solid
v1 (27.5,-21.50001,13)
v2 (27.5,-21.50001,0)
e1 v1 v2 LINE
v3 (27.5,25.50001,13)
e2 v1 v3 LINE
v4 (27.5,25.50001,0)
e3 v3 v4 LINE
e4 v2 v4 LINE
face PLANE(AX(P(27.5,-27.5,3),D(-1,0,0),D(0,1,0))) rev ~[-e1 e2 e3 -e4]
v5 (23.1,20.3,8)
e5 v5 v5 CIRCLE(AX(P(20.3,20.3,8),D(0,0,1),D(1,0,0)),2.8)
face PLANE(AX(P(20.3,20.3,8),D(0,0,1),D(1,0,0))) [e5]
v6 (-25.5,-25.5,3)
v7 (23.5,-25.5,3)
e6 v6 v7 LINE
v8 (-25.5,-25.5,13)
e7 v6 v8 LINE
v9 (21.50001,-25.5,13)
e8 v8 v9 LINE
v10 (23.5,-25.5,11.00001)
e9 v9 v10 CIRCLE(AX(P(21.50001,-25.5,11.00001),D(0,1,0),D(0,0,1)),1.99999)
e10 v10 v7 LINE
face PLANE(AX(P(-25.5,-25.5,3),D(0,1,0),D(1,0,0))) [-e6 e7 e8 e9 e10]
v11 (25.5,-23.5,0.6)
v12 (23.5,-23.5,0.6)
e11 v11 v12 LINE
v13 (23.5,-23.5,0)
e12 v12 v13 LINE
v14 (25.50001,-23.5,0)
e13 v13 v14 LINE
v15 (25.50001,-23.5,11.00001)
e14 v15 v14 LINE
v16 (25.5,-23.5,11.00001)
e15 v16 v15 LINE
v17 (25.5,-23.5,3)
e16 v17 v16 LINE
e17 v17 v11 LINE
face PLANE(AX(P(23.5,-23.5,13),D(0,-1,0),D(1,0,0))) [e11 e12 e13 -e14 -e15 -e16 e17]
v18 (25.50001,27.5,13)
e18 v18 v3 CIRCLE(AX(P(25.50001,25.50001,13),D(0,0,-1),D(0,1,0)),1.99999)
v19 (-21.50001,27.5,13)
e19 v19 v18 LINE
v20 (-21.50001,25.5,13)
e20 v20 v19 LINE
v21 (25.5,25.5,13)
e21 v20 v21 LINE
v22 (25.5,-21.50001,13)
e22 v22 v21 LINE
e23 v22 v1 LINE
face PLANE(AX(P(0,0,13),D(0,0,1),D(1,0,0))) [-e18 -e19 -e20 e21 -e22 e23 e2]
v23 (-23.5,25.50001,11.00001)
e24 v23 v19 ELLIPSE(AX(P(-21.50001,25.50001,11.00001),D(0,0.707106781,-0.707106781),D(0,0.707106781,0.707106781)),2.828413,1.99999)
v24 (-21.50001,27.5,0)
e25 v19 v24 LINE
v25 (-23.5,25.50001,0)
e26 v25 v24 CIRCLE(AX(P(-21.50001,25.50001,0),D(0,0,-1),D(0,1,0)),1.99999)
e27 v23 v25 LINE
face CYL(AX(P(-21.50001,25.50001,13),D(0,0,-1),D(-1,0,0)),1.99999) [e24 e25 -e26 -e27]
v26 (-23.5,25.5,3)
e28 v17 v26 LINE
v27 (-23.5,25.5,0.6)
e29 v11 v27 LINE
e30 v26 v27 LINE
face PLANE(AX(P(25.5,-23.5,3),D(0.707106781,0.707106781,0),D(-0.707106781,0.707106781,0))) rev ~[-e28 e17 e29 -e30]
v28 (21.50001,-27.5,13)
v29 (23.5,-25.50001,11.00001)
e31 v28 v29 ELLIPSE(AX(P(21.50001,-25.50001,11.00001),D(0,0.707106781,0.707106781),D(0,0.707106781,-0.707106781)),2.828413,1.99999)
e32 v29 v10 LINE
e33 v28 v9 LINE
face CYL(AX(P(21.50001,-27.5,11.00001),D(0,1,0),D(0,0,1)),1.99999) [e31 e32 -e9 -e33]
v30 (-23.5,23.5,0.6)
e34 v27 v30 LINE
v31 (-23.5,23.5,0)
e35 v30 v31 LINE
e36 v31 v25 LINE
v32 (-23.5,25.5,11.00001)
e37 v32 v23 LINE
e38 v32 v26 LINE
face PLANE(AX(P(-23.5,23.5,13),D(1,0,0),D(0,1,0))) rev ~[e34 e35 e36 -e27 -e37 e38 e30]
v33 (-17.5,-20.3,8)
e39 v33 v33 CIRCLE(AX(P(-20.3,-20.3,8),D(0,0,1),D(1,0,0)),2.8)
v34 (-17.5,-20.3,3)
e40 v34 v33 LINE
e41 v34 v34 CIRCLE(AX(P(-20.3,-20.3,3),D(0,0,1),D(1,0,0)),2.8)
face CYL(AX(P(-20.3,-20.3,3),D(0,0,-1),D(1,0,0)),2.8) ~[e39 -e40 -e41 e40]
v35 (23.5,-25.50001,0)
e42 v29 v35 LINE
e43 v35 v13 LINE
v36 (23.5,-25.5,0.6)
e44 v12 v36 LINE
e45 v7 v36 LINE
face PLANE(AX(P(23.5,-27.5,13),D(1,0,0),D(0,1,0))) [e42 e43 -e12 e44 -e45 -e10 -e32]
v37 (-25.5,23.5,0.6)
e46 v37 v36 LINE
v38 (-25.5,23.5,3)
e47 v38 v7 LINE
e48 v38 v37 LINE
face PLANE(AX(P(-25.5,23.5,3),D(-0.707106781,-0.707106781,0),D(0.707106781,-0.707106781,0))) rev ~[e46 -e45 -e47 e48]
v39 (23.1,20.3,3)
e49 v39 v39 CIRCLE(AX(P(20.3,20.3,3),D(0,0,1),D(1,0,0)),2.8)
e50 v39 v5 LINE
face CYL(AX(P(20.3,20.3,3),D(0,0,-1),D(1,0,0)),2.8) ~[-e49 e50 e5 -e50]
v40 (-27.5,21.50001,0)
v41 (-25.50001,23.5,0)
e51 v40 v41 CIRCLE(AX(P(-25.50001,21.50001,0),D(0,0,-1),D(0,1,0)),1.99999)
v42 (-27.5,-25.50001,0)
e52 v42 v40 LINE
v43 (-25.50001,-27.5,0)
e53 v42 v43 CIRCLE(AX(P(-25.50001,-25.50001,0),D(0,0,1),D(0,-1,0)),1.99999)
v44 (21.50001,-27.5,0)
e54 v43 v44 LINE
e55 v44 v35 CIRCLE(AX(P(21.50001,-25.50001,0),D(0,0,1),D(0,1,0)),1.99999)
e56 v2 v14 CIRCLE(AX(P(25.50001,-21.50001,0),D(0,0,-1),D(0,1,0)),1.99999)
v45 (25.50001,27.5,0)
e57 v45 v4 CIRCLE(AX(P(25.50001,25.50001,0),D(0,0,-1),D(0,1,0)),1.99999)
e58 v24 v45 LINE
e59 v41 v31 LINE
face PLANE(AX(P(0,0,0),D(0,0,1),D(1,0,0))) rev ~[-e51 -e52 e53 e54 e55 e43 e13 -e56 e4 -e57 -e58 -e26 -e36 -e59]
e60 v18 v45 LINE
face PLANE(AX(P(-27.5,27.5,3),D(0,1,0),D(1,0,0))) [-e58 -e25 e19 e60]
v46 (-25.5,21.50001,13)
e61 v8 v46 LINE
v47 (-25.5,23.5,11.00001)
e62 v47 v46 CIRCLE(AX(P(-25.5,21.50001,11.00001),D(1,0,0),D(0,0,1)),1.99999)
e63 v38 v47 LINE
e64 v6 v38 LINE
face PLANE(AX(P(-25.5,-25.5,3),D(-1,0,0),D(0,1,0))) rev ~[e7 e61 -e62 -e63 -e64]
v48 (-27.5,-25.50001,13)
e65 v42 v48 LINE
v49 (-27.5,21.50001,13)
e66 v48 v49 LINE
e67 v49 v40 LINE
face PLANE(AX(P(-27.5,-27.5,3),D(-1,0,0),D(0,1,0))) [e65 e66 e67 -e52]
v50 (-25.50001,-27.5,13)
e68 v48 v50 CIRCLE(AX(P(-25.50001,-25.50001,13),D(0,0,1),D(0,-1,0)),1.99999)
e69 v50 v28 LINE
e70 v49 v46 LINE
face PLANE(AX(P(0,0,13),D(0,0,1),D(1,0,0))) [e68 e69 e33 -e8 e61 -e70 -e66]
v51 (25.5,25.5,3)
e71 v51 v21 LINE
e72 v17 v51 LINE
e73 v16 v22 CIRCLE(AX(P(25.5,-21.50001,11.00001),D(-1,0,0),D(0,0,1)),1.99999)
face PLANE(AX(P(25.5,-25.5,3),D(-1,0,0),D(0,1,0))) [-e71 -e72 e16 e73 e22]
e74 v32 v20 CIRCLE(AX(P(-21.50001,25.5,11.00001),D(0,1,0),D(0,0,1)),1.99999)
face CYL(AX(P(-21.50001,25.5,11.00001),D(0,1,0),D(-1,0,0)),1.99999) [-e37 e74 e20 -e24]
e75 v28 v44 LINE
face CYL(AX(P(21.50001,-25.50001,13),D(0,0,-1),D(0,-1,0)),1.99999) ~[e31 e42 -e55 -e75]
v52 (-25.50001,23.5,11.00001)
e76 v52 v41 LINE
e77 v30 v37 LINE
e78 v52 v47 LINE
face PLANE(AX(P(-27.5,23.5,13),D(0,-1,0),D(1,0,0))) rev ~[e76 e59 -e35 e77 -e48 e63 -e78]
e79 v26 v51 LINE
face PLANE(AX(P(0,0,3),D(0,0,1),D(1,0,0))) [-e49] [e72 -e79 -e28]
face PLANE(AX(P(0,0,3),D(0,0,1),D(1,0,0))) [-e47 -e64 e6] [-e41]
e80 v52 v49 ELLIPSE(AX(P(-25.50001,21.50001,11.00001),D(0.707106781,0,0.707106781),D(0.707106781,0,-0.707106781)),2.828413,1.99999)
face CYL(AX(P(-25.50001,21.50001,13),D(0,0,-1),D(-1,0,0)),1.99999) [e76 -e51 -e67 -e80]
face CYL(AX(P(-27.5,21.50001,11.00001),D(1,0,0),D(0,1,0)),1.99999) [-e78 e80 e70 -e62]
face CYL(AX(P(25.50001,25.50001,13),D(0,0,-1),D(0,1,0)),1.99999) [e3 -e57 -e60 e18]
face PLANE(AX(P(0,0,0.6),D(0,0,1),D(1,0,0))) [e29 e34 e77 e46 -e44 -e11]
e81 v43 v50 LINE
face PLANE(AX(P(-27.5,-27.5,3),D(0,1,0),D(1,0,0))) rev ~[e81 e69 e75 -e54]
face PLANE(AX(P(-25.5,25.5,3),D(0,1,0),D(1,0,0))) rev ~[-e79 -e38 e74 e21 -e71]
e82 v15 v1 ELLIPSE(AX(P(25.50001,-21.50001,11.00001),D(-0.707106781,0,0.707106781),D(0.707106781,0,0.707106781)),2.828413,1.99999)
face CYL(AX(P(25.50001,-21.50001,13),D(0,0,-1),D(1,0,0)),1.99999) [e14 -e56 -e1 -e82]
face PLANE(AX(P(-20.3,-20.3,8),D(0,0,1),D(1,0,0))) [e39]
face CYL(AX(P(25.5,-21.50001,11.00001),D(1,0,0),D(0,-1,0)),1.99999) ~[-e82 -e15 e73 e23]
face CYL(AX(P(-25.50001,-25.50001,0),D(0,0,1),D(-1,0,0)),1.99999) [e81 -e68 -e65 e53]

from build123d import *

# Parameters (mm, degrees)
F0_W     = 55
F0_H     = 55
F1_DEPTH = 3
F2_W     = 55
F2_H     = 55
F2_W_2   = 51
F2_H_2   = 51
F3_DEPTH = 10
F4_R     = 2.8
F5_DEPTH = 5
F6_W     = 4
F6_H     = 4
F7_DEPTH = 25
F9_DEPTH = 2.4
F10_R    = 1.99999


# Not quite as in the source:
# - a fillet or chamfer is up to 0.001 mm smaller than in the source, because OpenCascade refuses the exact size


with BuildPart() as f1:
    # F0 (on Top) → F1 (new body)
    with BuildSketch(Plane.XY):
        Rectangle(F0_W, F0_H)
    extrude(amount=F1_DEPTH)

    # F2 (on face) → F3 (join)
    with BuildSketch(Plane.XY.offset(3)):
        Rectangle(F2_W, F2_H)
        Rectangle(F2_W_2, F2_H_2, mode=Mode.SUBTRACT)
    extrude(amount=F3_DEPTH)

    # F4 (on face) → F5 (join)
    with BuildSketch(Plane.XY.offset(3)):
        with Locations((-20.3, -20.3)):
            Circle(F4_R)
        with Locations((20.3, 20.3)):
            Circle(F4_R)
    extrude(amount=F5_DEPTH)

    # F6 (on face) → F7 (cut)
    with BuildSketch(Plane.XY.offset(13)):
        with Locations((-25.5, 25.5)):
            Rectangle(F6_W, F6_H)
        with Locations((25.5, -25.5)):
            Rectangle(F6_W, F6_H)
    extrude(amount=-F7_DEPTH, mode=Mode.SUBTRACT)

    # F8 (on face) → F9 (cut)
    with BuildSketch(Plane.XY.offset(3)):
        Polygon((-23.5, 25.5), (-25.5, 23.5), (23.5, -25.5), (25.5, -23.5), align=None)
    extrude(amount=-F9_DEPTH, mode=Mode.SUBTRACT)

    # F10 (radius 2 in the source; OpenCascade refuses exactly that, so slightly less here)
    f10_edges = [f1.edges().sort_by_distance(p)[0] for p in [
        (-26.5, 23.5, 13),
        (23.5, -26.5, 13),
        (26.5, -23.5, 13),
        (-23.5, 26.5, 13),
        (-27.5, 23.5, 6.5),
        (-23.5, 27.5, 6.5),
        (23.5, -27.5, 6.5),
        (27.5, -23.5, 6.5),
        (-27.5, -27.5, 6.5),
        (27.5, 27.5, 6.5),
    ]]
    fillet(f10_edges, radius=F10_R)


solid = f1.part
